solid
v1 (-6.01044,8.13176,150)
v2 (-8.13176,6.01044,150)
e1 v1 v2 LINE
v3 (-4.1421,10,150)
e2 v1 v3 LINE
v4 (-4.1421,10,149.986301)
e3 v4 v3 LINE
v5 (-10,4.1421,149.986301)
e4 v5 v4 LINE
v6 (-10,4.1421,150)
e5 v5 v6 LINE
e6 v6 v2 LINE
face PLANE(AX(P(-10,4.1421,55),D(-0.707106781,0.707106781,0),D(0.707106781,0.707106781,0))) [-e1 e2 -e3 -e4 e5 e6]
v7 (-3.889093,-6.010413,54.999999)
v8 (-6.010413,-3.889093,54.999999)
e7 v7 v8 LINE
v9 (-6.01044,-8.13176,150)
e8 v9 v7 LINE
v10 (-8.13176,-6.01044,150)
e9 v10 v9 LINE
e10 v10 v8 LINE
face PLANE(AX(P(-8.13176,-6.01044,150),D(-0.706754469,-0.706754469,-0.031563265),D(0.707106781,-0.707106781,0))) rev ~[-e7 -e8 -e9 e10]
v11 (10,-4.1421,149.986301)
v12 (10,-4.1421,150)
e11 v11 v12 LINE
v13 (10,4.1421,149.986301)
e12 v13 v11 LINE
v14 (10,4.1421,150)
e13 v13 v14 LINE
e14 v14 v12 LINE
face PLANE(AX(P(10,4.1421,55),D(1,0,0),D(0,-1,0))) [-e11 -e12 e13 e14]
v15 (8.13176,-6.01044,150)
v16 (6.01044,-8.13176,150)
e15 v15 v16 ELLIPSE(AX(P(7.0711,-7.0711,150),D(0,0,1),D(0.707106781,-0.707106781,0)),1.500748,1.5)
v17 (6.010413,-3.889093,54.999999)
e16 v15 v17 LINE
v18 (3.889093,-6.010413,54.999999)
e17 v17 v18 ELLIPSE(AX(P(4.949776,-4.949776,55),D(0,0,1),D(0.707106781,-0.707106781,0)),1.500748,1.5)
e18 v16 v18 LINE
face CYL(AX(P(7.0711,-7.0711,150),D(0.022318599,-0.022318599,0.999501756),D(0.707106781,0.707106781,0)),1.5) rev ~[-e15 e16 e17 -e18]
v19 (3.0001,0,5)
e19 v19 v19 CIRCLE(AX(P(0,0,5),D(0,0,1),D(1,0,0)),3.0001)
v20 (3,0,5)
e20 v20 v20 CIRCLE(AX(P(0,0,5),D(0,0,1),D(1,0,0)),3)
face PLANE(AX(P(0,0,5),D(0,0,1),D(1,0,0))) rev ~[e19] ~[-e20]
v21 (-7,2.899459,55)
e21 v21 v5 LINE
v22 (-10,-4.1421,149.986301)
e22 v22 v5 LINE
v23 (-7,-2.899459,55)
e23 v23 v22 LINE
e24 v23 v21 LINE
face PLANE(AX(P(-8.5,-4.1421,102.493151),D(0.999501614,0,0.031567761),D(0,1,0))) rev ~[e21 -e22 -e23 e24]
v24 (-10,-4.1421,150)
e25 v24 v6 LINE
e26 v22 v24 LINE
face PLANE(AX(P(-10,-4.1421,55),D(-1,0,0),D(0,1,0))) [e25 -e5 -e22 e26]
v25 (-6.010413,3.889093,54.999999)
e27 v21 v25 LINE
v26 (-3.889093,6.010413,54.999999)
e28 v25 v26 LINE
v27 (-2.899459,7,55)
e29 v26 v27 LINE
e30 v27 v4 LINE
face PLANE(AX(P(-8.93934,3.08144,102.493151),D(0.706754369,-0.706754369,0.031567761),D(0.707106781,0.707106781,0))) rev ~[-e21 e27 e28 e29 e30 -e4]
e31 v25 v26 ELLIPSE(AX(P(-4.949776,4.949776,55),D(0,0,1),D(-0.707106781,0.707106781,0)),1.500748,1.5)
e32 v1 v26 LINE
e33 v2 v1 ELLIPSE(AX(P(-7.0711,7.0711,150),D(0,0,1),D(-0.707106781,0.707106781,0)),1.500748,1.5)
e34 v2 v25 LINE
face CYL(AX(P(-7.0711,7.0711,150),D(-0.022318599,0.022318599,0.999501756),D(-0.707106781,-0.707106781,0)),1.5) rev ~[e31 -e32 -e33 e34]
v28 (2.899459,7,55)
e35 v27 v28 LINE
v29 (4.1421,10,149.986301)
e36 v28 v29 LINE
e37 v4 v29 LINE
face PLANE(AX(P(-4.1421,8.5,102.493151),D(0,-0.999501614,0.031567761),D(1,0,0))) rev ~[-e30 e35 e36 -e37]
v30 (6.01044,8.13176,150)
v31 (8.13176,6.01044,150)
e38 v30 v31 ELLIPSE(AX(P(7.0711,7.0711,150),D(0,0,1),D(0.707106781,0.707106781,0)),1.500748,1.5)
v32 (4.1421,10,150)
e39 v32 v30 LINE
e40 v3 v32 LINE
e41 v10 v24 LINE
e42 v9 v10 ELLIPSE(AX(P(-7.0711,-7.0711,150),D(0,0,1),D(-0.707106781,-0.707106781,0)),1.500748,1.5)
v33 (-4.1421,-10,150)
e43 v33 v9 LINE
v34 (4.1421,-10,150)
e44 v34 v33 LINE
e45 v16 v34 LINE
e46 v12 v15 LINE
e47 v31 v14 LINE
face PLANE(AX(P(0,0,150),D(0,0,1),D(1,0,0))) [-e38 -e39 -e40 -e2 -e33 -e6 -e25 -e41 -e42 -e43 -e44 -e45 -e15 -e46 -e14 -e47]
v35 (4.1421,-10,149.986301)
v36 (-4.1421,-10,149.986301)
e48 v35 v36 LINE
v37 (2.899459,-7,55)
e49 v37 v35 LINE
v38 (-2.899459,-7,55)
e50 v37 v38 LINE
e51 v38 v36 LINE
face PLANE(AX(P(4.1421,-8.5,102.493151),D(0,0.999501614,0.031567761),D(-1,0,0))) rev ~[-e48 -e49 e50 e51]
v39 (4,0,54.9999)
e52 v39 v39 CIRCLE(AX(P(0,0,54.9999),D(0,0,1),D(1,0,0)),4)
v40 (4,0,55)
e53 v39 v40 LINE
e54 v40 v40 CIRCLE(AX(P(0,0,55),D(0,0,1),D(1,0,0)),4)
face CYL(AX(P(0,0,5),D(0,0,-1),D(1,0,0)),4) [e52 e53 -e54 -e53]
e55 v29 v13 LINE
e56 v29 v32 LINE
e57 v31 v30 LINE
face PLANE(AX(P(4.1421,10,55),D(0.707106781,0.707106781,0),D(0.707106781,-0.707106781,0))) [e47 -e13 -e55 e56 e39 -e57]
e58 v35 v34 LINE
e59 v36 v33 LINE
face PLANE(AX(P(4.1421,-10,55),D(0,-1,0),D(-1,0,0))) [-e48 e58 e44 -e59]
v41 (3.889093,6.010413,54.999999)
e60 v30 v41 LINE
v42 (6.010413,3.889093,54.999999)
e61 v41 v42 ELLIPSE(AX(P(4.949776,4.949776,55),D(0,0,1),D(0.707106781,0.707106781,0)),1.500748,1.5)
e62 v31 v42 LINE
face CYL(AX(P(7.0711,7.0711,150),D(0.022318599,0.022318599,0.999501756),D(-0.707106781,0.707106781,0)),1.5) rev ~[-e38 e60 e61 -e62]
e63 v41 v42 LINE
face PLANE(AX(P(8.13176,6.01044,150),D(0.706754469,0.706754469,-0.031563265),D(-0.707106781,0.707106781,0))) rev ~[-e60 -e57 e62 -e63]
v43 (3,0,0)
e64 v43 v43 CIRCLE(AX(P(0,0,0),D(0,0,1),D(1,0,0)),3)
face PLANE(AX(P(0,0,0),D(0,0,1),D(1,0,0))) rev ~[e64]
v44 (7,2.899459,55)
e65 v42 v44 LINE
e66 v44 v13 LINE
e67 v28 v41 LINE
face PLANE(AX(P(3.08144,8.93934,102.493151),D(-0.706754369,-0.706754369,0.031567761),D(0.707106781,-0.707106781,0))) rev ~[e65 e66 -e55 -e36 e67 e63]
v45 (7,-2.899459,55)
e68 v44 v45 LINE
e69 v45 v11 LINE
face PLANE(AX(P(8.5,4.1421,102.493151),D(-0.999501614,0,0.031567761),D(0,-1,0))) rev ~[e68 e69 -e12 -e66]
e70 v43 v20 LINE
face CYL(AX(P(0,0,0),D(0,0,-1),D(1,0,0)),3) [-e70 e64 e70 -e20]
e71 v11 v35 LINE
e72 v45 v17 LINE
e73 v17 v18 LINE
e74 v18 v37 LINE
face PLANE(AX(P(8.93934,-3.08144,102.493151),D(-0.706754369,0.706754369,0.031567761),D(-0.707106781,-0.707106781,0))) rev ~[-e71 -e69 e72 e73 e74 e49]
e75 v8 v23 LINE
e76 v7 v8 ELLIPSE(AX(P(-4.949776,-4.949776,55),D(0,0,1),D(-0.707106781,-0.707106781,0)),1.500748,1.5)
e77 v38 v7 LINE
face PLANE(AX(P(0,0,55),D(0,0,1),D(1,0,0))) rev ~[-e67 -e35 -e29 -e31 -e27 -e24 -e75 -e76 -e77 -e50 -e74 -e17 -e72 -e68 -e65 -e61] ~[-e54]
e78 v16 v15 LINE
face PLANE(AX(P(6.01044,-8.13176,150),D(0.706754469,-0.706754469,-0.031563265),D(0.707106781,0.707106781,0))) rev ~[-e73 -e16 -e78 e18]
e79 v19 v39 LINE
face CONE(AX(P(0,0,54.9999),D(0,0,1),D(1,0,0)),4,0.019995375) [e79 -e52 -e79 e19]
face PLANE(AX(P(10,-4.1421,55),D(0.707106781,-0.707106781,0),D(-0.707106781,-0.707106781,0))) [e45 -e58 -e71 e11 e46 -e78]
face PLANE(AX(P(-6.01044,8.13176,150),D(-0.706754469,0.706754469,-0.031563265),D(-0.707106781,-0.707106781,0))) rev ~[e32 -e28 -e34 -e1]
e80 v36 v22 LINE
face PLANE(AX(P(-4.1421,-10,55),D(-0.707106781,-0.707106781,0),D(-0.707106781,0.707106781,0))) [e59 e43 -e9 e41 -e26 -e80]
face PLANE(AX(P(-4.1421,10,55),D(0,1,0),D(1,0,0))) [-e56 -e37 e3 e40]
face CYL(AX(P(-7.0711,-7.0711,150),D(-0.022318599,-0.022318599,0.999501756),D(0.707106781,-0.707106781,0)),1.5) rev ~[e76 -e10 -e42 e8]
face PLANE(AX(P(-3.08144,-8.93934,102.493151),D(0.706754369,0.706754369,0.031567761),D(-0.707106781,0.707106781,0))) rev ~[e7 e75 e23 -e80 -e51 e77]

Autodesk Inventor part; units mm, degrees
sketch "Эскиз1" plane through (0, 0, 0) normal (0, 0, 1) x (1, 0, 0)
  circle A0 centre (0, 0) radius 3
  dimension "d0" = 6
extrude "Выдавливание1" add sketch "Эскиз1" along normal blind 5
sketch "Эскиз2" plane through (0, 0, 5) normal (0, 0, 1) x (1, 0, 0)
  circle A0 centre (0, 0) radius 4
  dimension "d3" = 8
extrude "Выдавливание2" add sketch "Эскиз2" along normal blind 50
sketch "Эскиз3" plane through (0, 0, 55) normal (0, 0, 1) x (1, 0, 0)
  line L0 (-10, 4.1421) -> (-4.1421, 10)
  line L1 (-4.1421, 10) -> (4.1421, 10)
  line L2 (4.1421, 10) -> (10, 4.1421)
  line L3 (10, 4.1421) -> (10, -4.1421)
  line L4 (10, -4.1421) -> (4.1421, -10)
  line L5 (4.1421, -10) -> (-4.1421, -10)
  line L6 (-4.1421, -10) -> (-10, -4.1421)
  line L7 (-10, -4.1421) -> (-10, 4.1421)
  point P0 (0, 0)
  point P1 (0, 0)
  dimension "d6" = 20
extrude "Выдавливание3" add sketch "Эскиз3" along normal blind 95
chamfer "Фаска1" distance 1 distance2 50 1 edges at (-4, 0, 5) measured on face at (3.6279, -0.3191, 5)
chamfer "Фаска2" distance 3 angle 88.191 8 edges at (7.0711, 7.0711, 55) (0, 10, 55) (-7.0711, 7.0711, 55) (-10, 0, 55) (-7.0711, -7.0711, 55) (0, -10, 55) (7.0711, -7.0711, 55) (10, 0, 55) measured on face at (-0.1607, 7.9903, 55)
ref_plane "РабПлоскость1" through (-7.0711, 7.0711, 150) normal (-0.0223186, 0.0223186, 0.9995018) x (-0.7071068, -0.7071068, 0)
sketch "Эскиз4" plane through (-7.0711, 7.0711, 150) normal (-0.0223186, 0.0223186, 0.9995018) x (-0.7071068, -0.7071068, 0)
  line L0 (-4.1421, 0) -> (4.1421, 0) projected
  arc A0 (1.5, 0) -> (-1.5, 0) centre (0, 0) ccw
  point P0 (0, 5.2605)
  dimension "d15" = 1.5
extrude "Выдавливание4" cut sketch "Эскиз4" against normal up to next
ref_plane "РабПлоскость2" through (7.0711, 7.0711, 150) normal (0.0223186, 0.0223186, 0.9995018) x (-0.7071068, 0.7071068, 0)
sketch "Эскиз5" plane through (7.0711, 7.0711, 150) normal (0.0223186, 0.0223186, 0.9995018) x (-0.7071068, 0.7071068, 0)
  line L0 (-4.1421, 0) -> (4.1421, 0) projected
  line L1 (-2.8995, 0) -> (2.8995, 0) projected
  arc A0 (1.5, 0) -> (-1.5, 0) centre (0, 0) ccw
  line L2 (1.5, 0) -> (-1.5, 0)
  point P0 (0, 5.2605)
  dimension "d18" = 1.5
extrude "Выдавливание5" cut sketch "Эскиз5" against normal up to next
ref_plane "РабПлоскость3" through (7.0711, -7.0711, 150) normal (0.0223186, -0.0223186, 0.9995018) x (0.7071068, 0.7071068, 0)
ref_plane "РабПлоскость4" through (-7.0711, -7.0711, 150) normal (-0.0223186, -0.0223186, 0.9995018) x (0.7071068, -0.7071068, 0)
sketch "Эскиз6" plane through (7.0711, -7.0711, 150) normal (0.0223186, -0.0223186, 0.9995018) x (0.7071068, 0.7071068, 0)
  line L0 (-4.1421, 0) -> (4.1421, 0) projected
  arc A0 (1.5, 0) -> (-1.5, 0) centre (0, 0) ccw
  line L1 (1.5, 0) -> (-1.5, 0)
  point P0 (0, 5.2605)
  dimension "d21" = 1.5
extrude "Выдавливание6" cut sketch "Эскиз6" against normal up to next
sketch "Эскиз7" plane through (-7.0711, -7.0711, 150) normal (-0.0223186, -0.0223186, 0.9995018) x (0.7071068, -0.7071068, 0)
  line L0 (-4.1421, 0) -> (4.1421, 0) projected
  arc A0 (1.5, 0) -> (-1.5, 0) centre (0, 0) ccw
  line L1 (-1.5, 0) -> (1.5, 0)
  point P0 (0, 5.2605)
  dimension "d24" = 1.5
extrude "Выдавливание7" cut sketch "Эскиз7" against normal up to next
properties part number "itomaki" material "Клен"
